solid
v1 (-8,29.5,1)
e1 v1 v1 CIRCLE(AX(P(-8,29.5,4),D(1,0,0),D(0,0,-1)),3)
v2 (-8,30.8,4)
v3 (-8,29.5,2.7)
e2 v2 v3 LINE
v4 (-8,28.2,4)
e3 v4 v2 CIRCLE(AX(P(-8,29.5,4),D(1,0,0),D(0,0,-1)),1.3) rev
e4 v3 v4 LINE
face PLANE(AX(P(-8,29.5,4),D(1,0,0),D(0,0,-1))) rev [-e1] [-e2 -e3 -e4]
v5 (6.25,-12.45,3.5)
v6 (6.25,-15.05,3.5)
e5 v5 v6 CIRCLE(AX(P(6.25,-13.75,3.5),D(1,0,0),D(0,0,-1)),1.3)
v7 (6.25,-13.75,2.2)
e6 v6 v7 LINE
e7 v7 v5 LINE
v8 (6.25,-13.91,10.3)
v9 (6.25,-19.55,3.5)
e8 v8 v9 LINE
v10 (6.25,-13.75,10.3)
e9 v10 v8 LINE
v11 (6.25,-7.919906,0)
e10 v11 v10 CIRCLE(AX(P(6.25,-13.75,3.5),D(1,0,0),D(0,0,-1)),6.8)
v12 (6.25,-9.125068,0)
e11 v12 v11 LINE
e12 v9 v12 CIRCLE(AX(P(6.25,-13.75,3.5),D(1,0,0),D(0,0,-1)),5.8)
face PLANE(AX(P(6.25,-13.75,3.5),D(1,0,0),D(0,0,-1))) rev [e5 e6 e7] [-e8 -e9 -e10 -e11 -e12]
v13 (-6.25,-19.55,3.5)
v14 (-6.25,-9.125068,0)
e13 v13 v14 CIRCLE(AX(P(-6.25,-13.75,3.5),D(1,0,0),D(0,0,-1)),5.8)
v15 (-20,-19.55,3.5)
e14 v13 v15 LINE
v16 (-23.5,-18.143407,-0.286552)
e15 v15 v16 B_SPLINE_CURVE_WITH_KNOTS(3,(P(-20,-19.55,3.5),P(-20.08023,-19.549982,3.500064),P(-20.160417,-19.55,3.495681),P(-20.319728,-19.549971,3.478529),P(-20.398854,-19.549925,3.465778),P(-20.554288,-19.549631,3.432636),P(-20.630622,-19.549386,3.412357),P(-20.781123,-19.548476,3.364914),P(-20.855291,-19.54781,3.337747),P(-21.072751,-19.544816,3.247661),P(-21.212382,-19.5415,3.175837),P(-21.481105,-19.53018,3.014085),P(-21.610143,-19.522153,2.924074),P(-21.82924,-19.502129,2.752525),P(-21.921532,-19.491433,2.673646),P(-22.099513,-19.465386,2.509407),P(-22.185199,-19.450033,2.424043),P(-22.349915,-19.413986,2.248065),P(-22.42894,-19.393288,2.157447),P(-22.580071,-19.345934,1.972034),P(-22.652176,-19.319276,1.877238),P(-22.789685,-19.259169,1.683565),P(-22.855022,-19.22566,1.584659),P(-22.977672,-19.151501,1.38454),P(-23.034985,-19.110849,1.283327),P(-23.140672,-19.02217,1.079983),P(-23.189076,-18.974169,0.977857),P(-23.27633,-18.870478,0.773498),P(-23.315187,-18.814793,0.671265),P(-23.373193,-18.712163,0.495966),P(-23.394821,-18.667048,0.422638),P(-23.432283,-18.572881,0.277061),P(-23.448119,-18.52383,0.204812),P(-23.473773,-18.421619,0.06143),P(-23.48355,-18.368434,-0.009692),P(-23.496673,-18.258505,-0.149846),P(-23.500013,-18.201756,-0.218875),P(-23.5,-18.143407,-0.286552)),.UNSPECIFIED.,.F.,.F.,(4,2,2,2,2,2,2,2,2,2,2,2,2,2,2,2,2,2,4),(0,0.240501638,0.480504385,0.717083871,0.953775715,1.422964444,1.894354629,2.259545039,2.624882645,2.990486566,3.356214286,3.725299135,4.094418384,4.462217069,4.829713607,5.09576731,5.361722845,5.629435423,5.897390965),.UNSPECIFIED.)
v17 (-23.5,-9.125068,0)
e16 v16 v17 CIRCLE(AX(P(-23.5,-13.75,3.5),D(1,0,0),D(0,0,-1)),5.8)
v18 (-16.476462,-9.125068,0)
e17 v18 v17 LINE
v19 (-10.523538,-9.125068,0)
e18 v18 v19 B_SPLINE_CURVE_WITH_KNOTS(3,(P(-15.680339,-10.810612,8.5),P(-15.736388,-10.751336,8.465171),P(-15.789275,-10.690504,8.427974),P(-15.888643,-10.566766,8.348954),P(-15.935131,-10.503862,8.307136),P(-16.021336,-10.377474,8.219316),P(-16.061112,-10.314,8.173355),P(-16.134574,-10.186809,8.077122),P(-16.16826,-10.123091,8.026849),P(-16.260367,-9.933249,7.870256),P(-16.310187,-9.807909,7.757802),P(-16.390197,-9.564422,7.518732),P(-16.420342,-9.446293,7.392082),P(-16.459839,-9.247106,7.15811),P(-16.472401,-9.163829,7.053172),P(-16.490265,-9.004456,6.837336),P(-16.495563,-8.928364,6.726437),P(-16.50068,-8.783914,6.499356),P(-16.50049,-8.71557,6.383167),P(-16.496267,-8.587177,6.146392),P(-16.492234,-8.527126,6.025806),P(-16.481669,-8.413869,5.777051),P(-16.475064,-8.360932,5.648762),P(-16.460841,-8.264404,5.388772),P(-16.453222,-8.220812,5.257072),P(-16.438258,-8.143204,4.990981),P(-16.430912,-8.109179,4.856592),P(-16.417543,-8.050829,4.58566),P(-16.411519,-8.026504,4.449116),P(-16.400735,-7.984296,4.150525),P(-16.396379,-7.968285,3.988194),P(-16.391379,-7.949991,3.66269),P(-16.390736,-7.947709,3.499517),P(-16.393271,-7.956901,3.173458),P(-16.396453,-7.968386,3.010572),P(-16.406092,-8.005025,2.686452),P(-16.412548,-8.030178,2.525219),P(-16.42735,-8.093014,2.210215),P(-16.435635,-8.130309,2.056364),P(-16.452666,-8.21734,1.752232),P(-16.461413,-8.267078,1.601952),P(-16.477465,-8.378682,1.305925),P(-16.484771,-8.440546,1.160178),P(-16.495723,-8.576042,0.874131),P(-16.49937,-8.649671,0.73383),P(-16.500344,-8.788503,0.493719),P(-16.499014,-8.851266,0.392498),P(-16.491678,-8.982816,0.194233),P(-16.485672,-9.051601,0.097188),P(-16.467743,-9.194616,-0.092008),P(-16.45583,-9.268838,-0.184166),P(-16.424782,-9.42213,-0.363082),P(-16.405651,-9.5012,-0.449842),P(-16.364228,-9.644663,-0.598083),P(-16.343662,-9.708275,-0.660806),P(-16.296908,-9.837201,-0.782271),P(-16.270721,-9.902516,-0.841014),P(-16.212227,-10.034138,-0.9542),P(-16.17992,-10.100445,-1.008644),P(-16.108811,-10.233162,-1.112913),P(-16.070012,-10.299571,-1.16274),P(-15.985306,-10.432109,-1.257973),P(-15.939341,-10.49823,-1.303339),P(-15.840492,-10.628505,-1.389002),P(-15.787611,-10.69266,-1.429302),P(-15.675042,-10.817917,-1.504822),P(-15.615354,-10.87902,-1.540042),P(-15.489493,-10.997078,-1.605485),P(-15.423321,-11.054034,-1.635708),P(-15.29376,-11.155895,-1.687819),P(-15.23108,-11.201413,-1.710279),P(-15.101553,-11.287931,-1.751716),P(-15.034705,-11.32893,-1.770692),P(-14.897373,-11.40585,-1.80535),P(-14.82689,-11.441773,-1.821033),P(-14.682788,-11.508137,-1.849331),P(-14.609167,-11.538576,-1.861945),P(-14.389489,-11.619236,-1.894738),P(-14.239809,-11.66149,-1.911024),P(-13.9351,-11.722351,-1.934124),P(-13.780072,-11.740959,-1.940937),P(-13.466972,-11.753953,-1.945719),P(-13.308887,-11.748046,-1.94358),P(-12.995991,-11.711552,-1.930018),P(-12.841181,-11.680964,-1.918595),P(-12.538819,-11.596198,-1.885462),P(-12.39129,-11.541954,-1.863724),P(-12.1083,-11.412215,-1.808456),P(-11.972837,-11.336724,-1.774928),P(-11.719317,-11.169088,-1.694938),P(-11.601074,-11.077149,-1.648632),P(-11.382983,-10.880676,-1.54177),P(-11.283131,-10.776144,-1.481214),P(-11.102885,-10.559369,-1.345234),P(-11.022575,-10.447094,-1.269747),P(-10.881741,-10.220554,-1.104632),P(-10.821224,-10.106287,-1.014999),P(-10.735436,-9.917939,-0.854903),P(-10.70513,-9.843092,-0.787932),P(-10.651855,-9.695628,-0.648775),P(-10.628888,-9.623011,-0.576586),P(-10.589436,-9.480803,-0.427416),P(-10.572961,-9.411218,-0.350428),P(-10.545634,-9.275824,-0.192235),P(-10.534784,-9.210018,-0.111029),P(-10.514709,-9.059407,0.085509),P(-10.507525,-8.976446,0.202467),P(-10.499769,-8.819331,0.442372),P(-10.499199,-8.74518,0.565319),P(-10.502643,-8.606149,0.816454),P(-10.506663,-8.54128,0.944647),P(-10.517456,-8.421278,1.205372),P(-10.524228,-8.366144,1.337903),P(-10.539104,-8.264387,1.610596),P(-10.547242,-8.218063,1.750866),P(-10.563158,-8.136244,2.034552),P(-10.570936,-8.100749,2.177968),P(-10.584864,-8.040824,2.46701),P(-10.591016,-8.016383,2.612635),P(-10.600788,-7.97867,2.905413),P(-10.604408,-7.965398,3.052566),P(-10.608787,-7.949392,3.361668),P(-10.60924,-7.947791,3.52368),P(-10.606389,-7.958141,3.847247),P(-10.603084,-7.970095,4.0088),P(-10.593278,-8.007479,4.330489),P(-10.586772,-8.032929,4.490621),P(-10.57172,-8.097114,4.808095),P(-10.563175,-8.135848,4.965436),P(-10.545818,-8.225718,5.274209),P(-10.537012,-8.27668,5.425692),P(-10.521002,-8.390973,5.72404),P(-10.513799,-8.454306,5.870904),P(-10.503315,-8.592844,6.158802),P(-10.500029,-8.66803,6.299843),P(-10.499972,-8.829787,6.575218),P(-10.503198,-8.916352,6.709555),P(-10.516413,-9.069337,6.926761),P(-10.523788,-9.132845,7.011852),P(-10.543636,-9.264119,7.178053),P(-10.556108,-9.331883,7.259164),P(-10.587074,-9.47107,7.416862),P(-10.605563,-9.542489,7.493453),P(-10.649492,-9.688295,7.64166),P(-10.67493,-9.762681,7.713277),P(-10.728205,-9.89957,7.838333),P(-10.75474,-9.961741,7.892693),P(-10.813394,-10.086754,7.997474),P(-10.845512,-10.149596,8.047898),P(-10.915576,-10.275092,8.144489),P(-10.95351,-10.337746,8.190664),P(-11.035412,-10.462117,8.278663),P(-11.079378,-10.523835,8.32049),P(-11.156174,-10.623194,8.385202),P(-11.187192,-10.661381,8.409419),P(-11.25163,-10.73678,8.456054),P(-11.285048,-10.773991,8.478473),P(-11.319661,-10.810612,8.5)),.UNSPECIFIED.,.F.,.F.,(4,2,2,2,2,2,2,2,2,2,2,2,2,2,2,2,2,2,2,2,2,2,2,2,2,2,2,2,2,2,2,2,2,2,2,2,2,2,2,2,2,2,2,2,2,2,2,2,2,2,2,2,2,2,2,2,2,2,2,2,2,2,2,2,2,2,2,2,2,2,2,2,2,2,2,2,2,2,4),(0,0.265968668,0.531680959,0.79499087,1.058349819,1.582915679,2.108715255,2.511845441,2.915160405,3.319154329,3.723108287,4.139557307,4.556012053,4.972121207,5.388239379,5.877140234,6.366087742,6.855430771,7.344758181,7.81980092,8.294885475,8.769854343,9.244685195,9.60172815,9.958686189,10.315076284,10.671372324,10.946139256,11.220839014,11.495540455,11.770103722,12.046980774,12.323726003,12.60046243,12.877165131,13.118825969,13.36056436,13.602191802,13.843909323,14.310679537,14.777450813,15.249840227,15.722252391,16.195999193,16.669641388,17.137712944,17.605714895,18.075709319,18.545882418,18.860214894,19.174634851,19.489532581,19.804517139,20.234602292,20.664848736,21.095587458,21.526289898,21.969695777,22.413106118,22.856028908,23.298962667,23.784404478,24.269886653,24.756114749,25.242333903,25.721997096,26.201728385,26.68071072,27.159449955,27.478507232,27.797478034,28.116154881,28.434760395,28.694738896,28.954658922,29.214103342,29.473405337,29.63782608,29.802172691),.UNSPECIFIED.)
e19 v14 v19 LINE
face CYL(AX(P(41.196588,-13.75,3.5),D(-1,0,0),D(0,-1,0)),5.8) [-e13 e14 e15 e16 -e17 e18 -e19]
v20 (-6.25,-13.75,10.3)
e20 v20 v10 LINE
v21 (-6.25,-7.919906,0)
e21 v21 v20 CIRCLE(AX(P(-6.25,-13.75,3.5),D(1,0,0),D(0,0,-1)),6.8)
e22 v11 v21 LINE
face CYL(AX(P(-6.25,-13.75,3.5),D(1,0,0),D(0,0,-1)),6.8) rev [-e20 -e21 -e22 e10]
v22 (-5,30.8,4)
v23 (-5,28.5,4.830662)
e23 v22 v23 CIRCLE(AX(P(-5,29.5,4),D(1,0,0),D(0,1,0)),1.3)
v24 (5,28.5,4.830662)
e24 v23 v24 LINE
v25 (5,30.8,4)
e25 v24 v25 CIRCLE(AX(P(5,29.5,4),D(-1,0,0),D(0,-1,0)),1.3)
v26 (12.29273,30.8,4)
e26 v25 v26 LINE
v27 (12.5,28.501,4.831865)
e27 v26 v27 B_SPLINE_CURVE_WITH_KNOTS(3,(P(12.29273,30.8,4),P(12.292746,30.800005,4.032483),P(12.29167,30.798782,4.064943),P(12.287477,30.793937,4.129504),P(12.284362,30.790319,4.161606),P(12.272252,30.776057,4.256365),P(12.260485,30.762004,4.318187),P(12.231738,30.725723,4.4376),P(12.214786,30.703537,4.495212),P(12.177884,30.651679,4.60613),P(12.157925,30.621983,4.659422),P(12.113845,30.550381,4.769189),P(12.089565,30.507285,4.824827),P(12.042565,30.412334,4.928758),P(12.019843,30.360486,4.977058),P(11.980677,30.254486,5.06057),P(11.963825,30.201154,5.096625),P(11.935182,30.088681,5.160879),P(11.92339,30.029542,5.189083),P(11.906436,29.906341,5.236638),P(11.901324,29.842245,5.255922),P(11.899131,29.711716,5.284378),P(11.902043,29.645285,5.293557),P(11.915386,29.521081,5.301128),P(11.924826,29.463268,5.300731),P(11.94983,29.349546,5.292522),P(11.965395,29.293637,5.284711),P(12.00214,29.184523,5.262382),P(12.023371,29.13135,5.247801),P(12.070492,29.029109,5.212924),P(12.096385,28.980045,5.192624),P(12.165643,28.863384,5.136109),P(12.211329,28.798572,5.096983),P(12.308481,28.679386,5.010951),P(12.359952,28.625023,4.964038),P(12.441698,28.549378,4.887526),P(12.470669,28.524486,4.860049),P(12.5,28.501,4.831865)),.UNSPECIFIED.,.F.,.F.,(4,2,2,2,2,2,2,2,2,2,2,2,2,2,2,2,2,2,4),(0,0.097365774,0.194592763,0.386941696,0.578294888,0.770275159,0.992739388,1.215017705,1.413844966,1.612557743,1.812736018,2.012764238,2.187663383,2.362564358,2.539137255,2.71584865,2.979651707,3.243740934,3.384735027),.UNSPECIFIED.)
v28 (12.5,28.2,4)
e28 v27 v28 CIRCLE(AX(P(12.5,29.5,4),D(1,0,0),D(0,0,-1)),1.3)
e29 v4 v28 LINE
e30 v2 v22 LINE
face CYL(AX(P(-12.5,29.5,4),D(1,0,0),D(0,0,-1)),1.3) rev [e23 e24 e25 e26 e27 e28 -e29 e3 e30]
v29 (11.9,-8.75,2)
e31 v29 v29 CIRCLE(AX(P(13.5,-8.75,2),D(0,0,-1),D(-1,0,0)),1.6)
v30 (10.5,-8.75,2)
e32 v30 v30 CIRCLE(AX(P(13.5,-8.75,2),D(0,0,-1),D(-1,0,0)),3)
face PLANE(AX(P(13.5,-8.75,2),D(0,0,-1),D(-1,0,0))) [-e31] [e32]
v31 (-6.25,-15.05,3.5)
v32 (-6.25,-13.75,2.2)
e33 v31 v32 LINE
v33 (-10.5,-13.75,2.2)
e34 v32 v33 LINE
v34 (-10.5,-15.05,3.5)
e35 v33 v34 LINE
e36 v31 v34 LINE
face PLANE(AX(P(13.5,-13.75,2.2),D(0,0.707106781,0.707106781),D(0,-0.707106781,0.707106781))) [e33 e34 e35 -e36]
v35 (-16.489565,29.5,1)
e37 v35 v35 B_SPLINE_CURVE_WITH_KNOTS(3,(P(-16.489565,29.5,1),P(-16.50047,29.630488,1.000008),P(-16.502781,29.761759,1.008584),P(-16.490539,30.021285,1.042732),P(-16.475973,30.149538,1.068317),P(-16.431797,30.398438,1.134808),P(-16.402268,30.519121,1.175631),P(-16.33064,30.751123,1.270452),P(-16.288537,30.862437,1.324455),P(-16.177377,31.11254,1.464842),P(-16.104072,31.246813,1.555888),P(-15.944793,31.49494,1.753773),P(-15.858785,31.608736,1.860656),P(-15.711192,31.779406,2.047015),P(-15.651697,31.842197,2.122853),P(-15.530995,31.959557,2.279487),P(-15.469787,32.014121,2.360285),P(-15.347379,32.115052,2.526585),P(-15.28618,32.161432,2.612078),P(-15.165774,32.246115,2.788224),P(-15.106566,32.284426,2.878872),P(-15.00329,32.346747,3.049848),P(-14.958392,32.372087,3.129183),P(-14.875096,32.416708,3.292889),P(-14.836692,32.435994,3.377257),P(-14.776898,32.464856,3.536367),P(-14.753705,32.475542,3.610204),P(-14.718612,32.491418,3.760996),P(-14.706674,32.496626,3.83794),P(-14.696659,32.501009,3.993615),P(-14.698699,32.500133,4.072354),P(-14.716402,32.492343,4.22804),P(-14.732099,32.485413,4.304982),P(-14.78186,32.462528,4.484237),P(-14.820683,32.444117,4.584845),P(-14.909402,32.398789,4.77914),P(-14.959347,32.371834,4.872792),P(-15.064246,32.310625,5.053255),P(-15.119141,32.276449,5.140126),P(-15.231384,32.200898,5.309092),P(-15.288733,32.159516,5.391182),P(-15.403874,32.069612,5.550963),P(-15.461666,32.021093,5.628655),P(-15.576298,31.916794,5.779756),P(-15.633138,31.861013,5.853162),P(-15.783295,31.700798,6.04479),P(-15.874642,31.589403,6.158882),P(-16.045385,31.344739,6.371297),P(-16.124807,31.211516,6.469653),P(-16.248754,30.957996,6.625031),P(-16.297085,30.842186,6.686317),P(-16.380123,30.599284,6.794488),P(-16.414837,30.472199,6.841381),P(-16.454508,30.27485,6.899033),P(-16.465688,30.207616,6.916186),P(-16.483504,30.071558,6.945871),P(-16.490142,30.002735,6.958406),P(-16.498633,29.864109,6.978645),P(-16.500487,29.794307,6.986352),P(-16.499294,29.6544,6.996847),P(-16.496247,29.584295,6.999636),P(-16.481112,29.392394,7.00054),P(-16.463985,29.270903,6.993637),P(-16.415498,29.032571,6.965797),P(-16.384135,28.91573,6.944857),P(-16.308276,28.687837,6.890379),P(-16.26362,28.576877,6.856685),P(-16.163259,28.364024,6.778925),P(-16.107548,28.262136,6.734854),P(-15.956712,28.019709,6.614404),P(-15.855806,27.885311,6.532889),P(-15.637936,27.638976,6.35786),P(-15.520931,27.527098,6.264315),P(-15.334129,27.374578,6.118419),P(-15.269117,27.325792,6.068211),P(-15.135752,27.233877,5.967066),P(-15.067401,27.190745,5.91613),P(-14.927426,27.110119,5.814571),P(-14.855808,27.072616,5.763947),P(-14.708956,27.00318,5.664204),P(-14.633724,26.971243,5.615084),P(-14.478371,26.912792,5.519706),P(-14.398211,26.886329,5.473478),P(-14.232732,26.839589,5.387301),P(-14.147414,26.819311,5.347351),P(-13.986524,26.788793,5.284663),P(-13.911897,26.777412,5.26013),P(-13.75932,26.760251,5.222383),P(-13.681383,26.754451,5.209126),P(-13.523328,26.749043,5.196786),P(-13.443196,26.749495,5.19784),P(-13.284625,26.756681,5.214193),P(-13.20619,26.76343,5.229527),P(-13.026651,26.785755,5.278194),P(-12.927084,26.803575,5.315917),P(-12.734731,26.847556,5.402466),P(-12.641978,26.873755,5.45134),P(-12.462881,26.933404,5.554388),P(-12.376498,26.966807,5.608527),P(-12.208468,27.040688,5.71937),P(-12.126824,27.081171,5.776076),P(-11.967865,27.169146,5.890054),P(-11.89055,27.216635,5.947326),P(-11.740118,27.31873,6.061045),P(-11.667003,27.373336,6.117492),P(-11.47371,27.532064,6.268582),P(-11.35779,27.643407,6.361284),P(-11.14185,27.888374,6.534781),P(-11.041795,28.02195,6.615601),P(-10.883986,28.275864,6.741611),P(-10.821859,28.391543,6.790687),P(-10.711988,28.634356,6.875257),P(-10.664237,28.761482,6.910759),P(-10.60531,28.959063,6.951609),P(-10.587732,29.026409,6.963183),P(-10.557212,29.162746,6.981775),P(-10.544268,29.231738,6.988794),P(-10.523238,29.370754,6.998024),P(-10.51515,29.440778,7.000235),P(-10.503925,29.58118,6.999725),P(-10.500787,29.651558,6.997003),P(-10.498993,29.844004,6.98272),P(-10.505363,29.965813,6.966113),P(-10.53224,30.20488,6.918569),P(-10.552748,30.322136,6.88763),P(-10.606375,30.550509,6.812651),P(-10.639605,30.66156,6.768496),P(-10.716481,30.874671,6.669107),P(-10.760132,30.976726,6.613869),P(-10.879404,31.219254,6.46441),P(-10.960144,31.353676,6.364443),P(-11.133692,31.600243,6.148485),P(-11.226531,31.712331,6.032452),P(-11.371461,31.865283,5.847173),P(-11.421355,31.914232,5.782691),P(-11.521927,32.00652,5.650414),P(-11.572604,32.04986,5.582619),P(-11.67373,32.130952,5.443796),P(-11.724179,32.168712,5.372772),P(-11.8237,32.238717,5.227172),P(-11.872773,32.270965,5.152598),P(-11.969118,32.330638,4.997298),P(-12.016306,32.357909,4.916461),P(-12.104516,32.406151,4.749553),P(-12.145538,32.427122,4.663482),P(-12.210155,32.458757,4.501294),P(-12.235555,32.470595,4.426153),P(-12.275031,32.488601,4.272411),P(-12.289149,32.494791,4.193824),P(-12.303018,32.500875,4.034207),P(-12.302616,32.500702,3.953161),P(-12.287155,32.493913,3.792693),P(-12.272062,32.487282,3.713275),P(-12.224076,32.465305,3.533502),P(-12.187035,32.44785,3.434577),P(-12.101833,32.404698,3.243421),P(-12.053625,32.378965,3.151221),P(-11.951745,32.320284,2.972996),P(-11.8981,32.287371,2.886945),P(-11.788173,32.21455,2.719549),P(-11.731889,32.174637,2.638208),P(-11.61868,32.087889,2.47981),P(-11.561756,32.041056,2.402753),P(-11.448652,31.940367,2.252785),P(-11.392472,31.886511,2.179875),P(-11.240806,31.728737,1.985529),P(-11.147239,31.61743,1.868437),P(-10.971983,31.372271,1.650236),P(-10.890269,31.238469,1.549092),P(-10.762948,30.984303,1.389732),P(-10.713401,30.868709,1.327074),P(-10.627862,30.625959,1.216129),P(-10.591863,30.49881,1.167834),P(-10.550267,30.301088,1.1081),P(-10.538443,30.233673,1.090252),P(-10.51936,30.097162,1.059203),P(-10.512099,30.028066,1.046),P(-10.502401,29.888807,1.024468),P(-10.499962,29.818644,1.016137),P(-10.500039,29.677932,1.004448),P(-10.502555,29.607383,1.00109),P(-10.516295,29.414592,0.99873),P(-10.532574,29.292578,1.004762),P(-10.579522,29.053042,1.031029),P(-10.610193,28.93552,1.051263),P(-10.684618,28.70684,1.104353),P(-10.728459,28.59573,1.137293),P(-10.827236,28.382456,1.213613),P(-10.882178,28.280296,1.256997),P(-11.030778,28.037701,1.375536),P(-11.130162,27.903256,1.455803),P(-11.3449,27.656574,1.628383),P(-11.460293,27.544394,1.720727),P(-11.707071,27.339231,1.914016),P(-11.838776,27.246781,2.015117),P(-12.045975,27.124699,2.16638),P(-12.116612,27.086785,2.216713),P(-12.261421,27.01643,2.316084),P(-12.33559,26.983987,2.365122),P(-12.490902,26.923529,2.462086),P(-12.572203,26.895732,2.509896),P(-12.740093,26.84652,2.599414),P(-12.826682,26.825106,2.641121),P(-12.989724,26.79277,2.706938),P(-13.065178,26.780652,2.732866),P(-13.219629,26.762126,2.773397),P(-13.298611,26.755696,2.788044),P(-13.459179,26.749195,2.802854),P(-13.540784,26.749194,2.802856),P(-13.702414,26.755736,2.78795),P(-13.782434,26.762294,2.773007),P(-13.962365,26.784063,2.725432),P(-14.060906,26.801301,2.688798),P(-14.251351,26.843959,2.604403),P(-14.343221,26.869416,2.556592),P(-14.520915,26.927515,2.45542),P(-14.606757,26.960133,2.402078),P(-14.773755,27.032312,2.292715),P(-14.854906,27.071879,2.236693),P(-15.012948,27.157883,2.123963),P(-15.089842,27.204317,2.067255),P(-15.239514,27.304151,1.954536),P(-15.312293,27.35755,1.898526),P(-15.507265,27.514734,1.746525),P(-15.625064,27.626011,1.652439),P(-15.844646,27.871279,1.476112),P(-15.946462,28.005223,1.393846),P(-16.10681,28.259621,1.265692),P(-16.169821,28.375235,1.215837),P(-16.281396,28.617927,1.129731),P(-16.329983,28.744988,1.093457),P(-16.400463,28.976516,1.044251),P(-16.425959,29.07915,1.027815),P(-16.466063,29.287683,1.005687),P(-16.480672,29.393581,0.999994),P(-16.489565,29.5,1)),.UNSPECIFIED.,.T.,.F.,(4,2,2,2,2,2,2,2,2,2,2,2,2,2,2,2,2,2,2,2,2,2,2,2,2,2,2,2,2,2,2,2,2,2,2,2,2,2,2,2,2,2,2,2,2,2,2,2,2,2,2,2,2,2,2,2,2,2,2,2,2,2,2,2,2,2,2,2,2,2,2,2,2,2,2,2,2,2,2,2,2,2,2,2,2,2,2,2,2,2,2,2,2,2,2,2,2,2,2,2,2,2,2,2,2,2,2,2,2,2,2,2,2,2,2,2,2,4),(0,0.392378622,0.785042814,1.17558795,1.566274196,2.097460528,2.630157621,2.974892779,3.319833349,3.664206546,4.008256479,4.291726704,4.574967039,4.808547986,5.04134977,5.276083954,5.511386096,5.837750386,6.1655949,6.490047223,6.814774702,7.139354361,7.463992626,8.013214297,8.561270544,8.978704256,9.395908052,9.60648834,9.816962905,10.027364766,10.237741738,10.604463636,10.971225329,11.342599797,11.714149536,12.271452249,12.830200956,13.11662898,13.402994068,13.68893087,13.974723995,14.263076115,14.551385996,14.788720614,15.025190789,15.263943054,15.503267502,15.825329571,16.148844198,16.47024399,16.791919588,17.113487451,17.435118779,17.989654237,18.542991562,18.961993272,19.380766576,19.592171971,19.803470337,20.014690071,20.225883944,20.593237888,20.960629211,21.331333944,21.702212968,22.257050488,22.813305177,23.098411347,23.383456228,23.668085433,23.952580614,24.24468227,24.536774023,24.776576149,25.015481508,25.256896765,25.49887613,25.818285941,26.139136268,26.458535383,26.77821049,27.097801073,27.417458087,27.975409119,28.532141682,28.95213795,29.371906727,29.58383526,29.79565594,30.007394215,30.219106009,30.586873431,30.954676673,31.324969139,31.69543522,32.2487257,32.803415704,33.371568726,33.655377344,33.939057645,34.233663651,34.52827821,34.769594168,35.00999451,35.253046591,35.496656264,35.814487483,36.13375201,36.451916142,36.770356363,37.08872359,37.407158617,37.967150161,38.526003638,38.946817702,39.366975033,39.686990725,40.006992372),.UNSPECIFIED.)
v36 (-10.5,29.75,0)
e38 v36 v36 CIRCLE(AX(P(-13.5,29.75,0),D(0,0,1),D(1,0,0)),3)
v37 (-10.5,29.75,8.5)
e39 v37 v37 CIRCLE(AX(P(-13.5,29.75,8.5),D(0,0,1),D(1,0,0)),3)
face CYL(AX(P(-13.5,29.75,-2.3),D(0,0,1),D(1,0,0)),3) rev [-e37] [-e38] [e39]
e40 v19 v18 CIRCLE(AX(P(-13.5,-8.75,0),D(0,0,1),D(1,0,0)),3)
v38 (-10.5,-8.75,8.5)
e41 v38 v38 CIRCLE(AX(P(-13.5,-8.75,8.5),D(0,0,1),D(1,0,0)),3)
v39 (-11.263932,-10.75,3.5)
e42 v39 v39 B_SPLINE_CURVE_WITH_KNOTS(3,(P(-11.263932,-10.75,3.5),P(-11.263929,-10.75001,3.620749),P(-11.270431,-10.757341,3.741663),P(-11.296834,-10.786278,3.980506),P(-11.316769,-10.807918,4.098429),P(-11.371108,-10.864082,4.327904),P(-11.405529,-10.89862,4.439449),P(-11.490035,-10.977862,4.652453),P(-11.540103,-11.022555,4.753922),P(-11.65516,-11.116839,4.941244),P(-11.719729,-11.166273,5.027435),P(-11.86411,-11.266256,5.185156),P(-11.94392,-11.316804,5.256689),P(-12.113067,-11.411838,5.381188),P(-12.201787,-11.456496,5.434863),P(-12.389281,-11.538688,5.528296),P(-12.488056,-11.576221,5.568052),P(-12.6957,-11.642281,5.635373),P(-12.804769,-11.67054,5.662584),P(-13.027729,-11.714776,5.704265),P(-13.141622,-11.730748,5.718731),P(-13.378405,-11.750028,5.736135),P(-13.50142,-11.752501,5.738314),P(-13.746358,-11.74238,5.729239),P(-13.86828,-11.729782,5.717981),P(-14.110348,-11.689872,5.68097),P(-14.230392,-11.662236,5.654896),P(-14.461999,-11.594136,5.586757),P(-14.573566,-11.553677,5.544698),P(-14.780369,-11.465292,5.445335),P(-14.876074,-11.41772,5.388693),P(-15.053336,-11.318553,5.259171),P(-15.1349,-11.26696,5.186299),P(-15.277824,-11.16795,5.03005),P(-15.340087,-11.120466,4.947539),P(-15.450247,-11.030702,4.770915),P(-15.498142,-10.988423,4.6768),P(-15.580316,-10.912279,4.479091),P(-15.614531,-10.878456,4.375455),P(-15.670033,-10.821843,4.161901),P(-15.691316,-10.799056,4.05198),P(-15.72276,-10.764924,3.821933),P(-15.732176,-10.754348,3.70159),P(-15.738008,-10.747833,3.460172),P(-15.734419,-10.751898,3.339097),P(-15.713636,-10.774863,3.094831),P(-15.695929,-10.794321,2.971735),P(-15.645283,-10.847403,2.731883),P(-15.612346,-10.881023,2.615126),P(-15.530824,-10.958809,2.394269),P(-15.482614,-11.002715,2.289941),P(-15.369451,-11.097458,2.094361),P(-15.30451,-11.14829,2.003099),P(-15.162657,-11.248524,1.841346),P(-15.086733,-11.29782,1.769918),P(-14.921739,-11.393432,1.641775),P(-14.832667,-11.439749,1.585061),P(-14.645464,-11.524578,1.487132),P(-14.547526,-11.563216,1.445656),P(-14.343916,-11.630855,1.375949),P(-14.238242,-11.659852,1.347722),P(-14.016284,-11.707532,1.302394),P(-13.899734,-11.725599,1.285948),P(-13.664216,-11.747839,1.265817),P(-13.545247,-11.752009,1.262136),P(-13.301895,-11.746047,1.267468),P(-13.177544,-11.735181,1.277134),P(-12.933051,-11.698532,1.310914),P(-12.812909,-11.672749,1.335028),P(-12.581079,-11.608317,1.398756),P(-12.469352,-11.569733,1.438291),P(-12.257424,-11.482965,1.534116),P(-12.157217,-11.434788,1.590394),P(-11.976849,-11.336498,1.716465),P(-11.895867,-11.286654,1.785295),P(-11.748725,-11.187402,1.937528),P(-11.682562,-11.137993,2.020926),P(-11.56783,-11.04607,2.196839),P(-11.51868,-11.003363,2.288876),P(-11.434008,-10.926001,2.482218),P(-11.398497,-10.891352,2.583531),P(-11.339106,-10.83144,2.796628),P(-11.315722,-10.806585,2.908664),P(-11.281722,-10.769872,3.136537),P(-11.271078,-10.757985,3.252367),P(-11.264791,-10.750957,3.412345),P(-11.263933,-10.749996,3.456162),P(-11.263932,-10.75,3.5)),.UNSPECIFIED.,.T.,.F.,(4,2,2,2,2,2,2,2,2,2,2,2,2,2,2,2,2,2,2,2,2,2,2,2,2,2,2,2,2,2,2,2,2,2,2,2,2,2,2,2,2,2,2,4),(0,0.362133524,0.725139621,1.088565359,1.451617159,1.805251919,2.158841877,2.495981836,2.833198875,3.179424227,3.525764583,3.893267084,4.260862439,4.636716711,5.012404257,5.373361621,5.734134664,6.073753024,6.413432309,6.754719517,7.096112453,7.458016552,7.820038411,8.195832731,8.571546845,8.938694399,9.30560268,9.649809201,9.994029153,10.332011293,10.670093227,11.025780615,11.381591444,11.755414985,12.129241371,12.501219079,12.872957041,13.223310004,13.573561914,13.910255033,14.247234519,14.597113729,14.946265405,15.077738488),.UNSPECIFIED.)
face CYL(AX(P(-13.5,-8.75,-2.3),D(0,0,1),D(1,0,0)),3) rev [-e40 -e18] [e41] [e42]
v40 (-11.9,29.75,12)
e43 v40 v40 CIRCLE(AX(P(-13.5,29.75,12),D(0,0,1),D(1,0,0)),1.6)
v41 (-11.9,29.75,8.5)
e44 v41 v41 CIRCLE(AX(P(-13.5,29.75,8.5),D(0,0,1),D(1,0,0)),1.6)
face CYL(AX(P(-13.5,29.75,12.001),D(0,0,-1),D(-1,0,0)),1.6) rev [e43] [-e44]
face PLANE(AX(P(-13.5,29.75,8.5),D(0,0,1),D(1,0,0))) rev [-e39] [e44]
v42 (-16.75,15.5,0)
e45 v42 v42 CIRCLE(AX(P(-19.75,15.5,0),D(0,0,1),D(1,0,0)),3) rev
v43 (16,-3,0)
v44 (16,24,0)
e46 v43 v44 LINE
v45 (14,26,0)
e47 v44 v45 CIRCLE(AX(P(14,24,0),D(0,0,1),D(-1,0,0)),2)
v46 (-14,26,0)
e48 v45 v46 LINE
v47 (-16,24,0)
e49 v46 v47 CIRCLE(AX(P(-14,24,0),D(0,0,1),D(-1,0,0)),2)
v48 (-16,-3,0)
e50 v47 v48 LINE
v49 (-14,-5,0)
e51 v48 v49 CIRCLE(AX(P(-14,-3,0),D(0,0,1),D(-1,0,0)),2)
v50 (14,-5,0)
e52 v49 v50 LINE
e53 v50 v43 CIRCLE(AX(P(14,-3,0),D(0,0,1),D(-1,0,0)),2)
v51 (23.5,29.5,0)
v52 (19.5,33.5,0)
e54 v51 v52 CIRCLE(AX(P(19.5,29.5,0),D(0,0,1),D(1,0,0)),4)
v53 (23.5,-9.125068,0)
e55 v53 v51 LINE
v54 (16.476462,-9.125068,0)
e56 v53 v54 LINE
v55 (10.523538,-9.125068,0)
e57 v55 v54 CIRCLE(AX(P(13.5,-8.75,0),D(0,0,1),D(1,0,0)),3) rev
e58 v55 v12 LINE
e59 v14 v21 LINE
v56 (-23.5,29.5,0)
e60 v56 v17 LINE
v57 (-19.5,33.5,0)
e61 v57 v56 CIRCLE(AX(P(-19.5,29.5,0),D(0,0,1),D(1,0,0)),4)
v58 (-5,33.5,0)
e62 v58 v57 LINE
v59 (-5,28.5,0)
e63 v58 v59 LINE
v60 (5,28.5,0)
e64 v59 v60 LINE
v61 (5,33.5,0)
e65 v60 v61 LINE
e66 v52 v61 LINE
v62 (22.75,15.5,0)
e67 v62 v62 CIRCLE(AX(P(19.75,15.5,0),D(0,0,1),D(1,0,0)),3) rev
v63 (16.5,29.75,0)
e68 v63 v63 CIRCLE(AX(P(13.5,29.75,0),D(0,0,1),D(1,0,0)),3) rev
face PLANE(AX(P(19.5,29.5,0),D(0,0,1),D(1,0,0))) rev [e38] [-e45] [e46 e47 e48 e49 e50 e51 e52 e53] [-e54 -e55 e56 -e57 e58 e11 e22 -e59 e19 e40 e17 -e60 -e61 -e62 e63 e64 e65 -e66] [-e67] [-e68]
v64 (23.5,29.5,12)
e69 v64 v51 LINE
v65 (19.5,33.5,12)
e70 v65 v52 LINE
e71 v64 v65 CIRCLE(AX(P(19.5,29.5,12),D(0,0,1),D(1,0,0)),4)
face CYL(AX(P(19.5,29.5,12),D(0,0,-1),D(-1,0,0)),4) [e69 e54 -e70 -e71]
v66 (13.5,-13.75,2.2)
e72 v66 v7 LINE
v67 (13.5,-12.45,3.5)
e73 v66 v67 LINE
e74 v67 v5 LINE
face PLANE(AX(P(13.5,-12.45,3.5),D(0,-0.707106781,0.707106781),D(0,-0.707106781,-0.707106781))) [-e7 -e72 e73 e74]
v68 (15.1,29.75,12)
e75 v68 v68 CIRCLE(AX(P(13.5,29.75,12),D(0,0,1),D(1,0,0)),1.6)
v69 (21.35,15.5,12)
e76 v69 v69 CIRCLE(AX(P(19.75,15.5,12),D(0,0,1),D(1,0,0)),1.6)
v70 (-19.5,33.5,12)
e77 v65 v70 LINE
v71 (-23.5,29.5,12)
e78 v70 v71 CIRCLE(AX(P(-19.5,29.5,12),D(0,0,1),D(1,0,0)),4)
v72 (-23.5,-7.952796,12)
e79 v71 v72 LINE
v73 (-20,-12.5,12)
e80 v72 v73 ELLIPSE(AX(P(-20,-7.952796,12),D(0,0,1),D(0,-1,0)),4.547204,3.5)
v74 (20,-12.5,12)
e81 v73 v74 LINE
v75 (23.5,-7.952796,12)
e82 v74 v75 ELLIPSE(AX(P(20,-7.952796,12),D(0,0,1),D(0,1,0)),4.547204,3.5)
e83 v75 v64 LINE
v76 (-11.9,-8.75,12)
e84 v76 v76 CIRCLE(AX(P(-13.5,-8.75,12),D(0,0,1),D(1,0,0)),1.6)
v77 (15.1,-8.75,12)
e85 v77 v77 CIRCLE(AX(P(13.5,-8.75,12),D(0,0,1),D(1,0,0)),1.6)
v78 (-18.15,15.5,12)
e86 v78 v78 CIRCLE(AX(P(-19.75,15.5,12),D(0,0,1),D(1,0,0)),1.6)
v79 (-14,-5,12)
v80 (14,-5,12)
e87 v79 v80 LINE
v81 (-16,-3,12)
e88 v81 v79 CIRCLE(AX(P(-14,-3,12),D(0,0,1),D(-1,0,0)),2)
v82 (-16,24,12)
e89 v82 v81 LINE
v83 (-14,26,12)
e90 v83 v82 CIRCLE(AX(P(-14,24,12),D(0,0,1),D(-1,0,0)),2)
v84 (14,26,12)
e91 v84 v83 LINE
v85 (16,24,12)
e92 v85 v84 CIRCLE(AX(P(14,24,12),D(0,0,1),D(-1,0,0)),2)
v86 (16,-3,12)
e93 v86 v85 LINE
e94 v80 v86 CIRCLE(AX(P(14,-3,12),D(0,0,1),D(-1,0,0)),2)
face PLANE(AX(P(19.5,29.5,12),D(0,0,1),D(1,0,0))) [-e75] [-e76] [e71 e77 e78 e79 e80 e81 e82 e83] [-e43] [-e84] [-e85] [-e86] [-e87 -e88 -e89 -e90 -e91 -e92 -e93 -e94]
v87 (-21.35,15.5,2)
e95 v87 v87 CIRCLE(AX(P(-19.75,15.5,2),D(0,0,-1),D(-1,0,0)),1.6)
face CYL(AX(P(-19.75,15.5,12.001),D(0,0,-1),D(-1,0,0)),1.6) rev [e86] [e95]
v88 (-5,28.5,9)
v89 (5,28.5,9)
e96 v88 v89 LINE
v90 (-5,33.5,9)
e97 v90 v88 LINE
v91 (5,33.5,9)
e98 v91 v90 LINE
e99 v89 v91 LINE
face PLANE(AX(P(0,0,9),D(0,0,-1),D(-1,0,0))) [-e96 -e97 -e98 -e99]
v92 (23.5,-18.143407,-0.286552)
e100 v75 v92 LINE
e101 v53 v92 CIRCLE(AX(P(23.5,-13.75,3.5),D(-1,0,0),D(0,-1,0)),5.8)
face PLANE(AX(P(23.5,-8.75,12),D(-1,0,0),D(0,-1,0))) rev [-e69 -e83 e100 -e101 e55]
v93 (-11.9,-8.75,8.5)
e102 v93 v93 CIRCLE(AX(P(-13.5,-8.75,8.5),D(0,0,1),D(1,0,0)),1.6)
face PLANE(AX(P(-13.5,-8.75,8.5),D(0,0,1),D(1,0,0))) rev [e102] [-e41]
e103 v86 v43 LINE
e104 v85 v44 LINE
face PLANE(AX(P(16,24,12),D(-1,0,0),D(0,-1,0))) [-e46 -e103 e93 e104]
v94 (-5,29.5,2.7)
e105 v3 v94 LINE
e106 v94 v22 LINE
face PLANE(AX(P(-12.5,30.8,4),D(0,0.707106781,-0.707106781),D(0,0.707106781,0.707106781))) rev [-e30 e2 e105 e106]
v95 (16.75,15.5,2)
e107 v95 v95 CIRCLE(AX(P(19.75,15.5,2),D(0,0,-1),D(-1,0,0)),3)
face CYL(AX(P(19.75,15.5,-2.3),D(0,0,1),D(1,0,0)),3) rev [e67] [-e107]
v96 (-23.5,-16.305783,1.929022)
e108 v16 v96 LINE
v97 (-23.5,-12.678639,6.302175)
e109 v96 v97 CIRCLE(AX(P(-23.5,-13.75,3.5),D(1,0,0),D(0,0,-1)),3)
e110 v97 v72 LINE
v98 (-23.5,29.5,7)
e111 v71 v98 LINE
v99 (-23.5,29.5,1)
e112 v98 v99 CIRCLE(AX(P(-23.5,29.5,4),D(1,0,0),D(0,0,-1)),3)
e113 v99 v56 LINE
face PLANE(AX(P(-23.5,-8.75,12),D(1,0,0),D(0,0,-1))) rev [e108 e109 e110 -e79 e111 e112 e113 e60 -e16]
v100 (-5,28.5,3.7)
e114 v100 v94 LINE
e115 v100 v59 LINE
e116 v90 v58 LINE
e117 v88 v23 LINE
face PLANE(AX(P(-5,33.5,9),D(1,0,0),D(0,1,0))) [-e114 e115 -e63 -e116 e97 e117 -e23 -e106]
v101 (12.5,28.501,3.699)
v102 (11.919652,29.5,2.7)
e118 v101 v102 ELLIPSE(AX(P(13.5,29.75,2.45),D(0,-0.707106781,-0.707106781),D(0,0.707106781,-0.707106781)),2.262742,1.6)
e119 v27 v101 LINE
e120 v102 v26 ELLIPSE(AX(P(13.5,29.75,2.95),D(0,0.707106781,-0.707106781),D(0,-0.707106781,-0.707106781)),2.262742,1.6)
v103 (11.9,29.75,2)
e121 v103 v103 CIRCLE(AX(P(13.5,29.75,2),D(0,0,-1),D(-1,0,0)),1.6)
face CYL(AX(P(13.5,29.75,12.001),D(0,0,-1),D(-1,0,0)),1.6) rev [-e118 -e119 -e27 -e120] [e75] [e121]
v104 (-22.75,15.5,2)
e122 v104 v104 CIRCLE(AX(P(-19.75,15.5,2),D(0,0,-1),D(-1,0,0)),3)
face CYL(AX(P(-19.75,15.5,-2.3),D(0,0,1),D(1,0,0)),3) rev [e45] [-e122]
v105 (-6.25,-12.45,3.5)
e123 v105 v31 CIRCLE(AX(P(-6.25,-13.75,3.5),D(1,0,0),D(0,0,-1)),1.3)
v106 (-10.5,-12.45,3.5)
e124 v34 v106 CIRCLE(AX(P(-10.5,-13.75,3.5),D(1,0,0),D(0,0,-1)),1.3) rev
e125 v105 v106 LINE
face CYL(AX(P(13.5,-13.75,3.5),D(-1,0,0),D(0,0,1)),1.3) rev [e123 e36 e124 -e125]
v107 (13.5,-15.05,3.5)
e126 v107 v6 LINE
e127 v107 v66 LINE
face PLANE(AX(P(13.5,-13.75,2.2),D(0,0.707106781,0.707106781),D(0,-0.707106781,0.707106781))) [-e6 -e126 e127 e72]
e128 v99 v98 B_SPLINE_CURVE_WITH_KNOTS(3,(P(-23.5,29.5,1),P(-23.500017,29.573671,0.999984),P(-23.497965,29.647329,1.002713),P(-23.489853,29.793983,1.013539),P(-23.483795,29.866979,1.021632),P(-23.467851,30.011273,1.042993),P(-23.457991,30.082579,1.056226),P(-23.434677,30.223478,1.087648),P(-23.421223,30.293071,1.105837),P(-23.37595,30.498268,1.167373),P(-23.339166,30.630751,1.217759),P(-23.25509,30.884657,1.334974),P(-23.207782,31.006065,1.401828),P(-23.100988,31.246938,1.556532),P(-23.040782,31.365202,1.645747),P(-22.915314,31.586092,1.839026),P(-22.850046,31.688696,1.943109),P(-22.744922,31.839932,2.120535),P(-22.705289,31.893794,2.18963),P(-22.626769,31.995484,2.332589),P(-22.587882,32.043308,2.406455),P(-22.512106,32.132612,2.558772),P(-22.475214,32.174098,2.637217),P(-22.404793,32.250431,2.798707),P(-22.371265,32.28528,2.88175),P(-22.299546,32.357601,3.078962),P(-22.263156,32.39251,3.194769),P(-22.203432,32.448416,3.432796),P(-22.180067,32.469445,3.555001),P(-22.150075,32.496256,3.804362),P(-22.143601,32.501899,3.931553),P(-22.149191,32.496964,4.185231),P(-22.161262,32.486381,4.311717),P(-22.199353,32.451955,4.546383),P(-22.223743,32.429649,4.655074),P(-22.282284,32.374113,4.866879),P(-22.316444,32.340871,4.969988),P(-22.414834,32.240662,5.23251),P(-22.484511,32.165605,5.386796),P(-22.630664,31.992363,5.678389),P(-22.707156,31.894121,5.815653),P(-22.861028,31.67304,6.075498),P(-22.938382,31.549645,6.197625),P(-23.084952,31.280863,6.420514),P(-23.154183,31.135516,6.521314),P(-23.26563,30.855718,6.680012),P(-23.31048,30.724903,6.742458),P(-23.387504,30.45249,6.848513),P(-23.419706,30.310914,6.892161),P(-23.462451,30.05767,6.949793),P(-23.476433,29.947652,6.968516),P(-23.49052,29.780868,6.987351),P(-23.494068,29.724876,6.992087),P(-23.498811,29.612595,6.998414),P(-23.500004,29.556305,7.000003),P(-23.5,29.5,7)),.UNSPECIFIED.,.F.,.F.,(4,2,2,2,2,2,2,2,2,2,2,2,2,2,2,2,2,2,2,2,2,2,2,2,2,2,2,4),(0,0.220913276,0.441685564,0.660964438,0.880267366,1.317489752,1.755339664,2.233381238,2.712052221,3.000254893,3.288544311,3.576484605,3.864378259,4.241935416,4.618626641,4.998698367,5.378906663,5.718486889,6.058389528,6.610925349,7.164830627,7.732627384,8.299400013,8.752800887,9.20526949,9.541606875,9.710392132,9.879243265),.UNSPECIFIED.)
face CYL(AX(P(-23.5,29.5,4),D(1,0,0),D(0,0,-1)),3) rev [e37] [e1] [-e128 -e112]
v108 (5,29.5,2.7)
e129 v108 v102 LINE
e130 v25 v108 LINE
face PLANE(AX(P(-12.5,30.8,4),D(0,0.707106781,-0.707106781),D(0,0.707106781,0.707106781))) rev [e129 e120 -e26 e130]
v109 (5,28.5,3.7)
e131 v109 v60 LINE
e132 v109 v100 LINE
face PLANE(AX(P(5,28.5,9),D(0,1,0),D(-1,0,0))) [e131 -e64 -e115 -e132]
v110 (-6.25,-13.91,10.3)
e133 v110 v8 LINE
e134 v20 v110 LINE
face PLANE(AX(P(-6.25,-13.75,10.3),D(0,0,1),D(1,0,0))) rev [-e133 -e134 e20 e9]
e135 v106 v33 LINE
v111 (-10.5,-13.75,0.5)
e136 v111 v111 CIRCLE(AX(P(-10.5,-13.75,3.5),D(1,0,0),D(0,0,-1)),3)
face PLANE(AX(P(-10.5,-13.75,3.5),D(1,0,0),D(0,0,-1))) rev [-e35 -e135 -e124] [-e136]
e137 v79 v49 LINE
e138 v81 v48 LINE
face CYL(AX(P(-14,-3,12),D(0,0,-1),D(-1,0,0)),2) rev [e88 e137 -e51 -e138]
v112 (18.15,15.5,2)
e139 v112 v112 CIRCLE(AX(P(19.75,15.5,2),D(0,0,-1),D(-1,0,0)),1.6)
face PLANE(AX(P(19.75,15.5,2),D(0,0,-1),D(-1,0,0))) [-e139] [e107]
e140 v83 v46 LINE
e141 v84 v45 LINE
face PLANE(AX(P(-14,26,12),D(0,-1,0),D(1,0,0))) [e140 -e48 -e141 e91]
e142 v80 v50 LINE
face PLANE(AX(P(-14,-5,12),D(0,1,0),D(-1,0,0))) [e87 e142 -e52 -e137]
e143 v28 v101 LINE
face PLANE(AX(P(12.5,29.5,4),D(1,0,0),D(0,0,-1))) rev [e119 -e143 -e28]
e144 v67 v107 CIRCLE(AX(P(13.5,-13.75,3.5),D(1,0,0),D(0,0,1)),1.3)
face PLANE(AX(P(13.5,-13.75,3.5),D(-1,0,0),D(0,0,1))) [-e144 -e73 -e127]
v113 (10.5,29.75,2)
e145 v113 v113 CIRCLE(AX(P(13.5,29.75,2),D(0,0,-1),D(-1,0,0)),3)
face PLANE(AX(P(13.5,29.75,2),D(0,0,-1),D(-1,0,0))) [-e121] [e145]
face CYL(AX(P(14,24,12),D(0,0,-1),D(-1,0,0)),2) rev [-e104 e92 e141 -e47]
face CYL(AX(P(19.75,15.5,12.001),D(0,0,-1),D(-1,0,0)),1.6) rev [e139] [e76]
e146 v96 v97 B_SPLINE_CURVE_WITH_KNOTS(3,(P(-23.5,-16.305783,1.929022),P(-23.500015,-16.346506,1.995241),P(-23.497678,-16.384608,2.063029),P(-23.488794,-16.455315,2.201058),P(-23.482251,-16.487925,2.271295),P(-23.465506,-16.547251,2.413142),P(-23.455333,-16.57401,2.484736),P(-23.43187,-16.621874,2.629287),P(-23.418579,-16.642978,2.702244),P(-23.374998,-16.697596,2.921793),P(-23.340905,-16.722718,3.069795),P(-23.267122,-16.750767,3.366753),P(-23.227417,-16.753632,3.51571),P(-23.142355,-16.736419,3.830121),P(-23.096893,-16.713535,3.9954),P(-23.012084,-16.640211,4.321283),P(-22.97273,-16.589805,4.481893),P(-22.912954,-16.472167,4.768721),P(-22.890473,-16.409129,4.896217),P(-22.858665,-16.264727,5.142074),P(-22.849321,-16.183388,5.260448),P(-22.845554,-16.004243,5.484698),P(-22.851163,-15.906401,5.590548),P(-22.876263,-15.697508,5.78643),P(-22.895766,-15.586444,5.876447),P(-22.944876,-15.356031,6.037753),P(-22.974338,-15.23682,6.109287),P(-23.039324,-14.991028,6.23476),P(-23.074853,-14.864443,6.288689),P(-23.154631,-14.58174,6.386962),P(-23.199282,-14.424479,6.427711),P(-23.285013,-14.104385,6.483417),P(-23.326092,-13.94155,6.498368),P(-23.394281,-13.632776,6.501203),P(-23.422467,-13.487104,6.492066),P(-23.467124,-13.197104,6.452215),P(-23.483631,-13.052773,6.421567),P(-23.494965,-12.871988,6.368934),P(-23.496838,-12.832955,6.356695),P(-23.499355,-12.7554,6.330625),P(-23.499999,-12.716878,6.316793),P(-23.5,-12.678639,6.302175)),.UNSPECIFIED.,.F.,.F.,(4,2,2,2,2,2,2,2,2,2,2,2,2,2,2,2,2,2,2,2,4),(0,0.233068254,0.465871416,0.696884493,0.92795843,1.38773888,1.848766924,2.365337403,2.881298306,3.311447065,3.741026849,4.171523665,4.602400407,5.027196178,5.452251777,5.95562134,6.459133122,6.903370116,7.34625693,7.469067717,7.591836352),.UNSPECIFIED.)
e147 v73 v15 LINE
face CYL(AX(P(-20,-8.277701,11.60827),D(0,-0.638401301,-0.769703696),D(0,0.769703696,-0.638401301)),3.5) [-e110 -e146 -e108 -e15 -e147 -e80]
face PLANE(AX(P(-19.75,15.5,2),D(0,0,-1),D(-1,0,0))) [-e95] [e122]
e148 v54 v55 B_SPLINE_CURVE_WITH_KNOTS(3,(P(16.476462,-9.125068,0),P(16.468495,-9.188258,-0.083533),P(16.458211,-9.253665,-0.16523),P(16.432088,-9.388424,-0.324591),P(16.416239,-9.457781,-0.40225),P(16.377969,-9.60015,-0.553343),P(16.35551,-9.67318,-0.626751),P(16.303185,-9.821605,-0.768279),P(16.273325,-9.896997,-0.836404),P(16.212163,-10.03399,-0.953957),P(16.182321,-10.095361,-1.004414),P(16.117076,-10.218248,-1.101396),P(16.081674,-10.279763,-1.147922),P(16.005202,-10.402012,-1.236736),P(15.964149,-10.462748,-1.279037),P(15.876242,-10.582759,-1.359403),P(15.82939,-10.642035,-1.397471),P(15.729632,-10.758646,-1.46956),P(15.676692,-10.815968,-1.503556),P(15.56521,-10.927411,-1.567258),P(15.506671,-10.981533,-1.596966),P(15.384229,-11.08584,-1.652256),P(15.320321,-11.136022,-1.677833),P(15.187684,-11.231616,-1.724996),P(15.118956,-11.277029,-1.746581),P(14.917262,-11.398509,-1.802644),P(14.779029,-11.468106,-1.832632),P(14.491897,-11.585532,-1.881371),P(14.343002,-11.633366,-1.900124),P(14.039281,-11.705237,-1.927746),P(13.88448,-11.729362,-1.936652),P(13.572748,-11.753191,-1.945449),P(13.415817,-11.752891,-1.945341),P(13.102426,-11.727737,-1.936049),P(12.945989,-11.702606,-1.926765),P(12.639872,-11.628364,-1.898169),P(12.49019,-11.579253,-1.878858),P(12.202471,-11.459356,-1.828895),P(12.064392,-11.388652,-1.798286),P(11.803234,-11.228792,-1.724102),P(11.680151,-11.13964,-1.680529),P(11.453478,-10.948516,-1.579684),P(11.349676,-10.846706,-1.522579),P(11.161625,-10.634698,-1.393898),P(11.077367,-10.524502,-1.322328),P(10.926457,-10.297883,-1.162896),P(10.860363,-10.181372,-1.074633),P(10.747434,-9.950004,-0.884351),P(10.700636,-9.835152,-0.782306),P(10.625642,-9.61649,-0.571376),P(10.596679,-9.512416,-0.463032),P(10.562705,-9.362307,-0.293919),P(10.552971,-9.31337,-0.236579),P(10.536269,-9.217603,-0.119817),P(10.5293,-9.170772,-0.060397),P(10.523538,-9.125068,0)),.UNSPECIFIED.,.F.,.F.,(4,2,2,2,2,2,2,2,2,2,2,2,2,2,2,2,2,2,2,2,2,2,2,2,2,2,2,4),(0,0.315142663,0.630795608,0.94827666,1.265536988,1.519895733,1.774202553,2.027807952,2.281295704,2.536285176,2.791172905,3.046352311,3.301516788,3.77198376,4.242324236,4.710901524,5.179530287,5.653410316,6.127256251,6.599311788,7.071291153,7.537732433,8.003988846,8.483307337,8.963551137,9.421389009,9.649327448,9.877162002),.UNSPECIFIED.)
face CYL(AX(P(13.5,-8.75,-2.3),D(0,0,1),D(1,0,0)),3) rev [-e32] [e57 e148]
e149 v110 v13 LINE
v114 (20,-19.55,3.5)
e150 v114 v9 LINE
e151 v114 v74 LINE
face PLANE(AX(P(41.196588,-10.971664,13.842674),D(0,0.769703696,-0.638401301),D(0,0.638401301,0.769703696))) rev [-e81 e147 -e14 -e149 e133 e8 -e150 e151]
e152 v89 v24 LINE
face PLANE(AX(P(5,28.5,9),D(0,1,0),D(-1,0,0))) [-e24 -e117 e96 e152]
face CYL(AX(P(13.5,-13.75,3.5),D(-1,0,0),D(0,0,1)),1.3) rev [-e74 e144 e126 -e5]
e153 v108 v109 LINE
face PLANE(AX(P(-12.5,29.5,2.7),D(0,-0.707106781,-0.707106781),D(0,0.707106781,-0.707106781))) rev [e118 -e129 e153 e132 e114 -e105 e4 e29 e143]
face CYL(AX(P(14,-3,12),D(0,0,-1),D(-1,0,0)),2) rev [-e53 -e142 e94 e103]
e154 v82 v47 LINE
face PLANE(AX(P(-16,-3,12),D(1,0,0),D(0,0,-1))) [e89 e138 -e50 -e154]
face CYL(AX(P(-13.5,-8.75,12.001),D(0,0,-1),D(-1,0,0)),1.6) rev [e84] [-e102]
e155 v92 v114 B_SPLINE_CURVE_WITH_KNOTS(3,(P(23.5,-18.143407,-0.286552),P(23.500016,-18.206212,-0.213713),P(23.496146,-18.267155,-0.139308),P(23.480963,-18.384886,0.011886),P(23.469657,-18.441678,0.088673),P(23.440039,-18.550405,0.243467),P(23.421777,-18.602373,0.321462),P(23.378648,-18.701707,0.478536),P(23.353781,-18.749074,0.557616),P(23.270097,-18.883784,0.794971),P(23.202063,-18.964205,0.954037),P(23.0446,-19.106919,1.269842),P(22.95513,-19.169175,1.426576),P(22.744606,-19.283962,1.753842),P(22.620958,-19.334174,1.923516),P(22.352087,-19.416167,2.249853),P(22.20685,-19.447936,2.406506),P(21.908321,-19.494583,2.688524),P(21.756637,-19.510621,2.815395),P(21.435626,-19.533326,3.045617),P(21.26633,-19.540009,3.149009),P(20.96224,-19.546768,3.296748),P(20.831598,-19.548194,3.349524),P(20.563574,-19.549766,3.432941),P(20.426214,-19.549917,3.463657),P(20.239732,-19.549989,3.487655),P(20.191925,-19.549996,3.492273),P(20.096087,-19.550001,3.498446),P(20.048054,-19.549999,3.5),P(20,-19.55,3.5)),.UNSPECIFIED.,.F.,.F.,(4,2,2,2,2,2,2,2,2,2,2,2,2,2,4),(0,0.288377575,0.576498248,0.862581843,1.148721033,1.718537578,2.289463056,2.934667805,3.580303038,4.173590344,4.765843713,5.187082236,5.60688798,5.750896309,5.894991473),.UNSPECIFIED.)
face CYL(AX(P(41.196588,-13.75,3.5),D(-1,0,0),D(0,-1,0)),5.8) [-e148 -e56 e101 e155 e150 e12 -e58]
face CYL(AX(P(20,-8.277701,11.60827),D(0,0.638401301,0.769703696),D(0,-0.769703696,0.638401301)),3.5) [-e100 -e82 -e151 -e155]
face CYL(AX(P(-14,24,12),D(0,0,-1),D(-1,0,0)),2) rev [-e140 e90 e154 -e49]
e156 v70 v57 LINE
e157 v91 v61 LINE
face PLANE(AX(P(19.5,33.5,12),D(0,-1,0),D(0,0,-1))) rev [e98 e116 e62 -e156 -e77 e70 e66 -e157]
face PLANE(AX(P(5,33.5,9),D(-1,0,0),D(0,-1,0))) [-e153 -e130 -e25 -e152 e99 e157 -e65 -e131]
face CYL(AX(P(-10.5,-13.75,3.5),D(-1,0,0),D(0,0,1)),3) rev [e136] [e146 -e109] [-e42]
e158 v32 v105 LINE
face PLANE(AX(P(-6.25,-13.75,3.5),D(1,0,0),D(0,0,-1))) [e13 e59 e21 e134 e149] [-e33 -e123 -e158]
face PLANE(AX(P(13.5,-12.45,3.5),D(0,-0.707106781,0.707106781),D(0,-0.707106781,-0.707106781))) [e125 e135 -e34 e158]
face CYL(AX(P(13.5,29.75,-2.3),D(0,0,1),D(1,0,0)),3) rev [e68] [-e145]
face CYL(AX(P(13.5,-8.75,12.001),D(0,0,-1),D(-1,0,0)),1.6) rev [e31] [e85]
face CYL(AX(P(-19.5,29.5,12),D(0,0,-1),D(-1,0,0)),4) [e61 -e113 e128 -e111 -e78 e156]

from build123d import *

# Parameters (mm, degrees)
BOSS_EXTRUDE1_DEPTH        = 12
CUT_EXTRUDE1_REACH         = 44.644
SKETCH3_R                  = 1.6
SKETCH6_W                  = 10
SKETCH6_H                  = 5
CUT_EXTRUDE3_DEPTH         = 9
CUT_EXTRUDE4_DEPTH         = 12.5
CUT_EXTRUDE5_START         = -23.5
CUT_EXTRUDE5_OUTLINE_R     = 3
CUT_EXTRUDE5_DEPTH         = 15.5
BOSS_EXTRUDE4_START        = -23.5
BOSS_EXTRUDE4_DEPTH        = 47
PIVOTSCREWHEADCUTOUT_START = -23.5
SKETCH10_R                 = 3
PIVOTSCREWHEADCUTOUT_DEPTH = 13
CUT_EXTRUDE2_START         = 8.5
SKETCH4_R                  = 3
CUT_EXTRUDE2_DEPTH         = 52.143874282
CUT_EXTRUDE10_START        = 10
SKETCH16_R                 = 3
CUT_EXTRUDE10_DEPTH        = 160.510325132
CUT_EXTRUDE7_START         = -23.5
CUT_EXTRUDE7_DEPTH         = 37
FILLET1_R                  = 3.5
CUT_EXTRUDE9_DEPTH         = 6.25


# Read off the part's stored shape, not the designer's step: Cut-Extrude5
with BuildPart() as part:
    # Sketch2 → Boss-Extrude1 (new body)
    with BuildSketch(Plane.XY):
        with BuildLine():
            Line((23.5, -8.75), (23.5, 29.5))
            ThreePointArc((23.5, 29.5), (22.328427125, 32.328427125), (19.5, 33.5))
            Line((19.5, 33.5), (-19.5, 33.5))
            ThreePointArc((-19.5, 33.5), (-22.328427125, 32.328427125), (-23.5, 29.5))
            Line((-23.5, 29.5), (-23.5, -8.75))
            Line((-23.5, -8.75), (-23.5, -12.5))
            Line((-23.5, -12.5), (-19.499997491, -12.5))
            Line((-19.499997491, -12.5), (19.531687848, -12.5))
            Line((19.531687848, -12.5), (23.5, -12.5))
            Line((23.5, -12.5), (23.5, -8.75))
        make_face()
        with BuildLine():
            Line((-16, -3), (-16, 24))
            ThreePointArc((-16, 24), (-15.414213562, 25.414213562), (-14, 26))
            Line((-14, 26), (14, 26))
            ThreePointArc((14, 26), (15.414213562, 25.414213562), (16, 24))
            Line((16, 24), (16, -3))
            ThreePointArc((16, -3), (15.414213562, -4.414213562), (14, -5))
            Line((14, -5), (-14, -5))
            ThreePointArc((-14, -5), (-15.414213562, -4.414213562), (-16, -3))
        make_face(mode=Mode.SUBTRACT)
    extrude(amount=BOSS_EXTRUDE1_DEPTH)

    # Sketch3 → Cut-Extrude1 (cut, up to next)
    with BuildSketch(Plane.XY, mode=Mode.PRIVATE) as cut_extrude1_sk1:
        with Locations((-13.5, 29.75)):
            Circle(SKETCH3_R)
    cut_extrude1_tool1 = extrude(cut_extrude1_sk1.sketch, amount=CUT_EXTRUDE1_REACH, mode=Mode.PRIVATE) & part.part
    # Sketch3 → Cut-Extrude1 (cut, up to next)
    with BuildSketch(Plane.XY, mode=Mode.PRIVATE) as cut_extrude1_sk2:
        with Locations((13.5, 29.75)):
            Circle(SKETCH3_R)
    cut_extrude1_tool2 = extrude(cut_extrude1_sk2.sketch, amount=CUT_EXTRUDE1_REACH, mode=Mode.PRIVATE) & part.part
    # Sketch3 → Cut-Extrude1 (cut, up to next)
    with BuildSketch(Plane.XY, mode=Mode.PRIVATE) as cut_extrude1_sk3:
        with Locations((19.75, 15.5)):
            Circle(SKETCH3_R)
    cut_extrude1_tool3 = extrude(cut_extrude1_sk3.sketch, amount=CUT_EXTRUDE1_REACH, mode=Mode.PRIVATE) & part.part
    # Sketch3 → Cut-Extrude1 (cut, up to next)
    with BuildSketch(Plane.XY, mode=Mode.PRIVATE) as cut_extrude1_sk4:
        with Locations((-19.75, 15.5)):
            Circle(SKETCH3_R)
    cut_extrude1_tool4 = extrude(cut_extrude1_sk4.sketch, amount=CUT_EXTRUDE1_REACH, mode=Mode.PRIVATE) & part.part
    # Sketch3 → Cut-Extrude1 (cut, up to next)
    with BuildSketch(Plane.XY, mode=Mode.PRIVATE) as cut_extrude1_sk5:
        with Locations((-13.5, -8.75)):
            Circle(SKETCH3_R)
    cut_extrude1_tool5 = extrude(cut_extrude1_sk5.sketch, amount=CUT_EXTRUDE1_REACH, mode=Mode.PRIVATE) & part.part
    # Sketch3 → Cut-Extrude1 (cut, up to next)
    with BuildSketch(Plane.XY, mode=Mode.PRIVATE) as cut_extrude1_sk6:
        with Locations((13.5, -8.75)):
            Circle(SKETCH3_R)
    cut_extrude1_tool6 = extrude(cut_extrude1_sk6.sketch, amount=CUT_EXTRUDE1_REACH, mode=Mode.PRIVATE) & part.part
    add(cut_extrude1_tool1.solids().sort_by_distance((-13.5, 29.75, 0))[0], mode=Mode.SUBTRACT)
    add(cut_extrude1_tool2.solids().sort_by_distance((13.5, 29.75, 0))[0], mode=Mode.SUBTRACT)
    add(cut_extrude1_tool3.solids().sort_by_distance((19.75, 15.5, 0))[0], mode=Mode.SUBTRACT)
    add(cut_extrude1_tool4.solids().sort_by_distance((-19.75, 15.5, 0))[0], mode=Mode.SUBTRACT)
    add(cut_extrude1_tool5.solids().sort_by_distance((-13.5, -8.75, 0))[0], mode=Mode.SUBTRACT)
    add(cut_extrude1_tool6.solids().sort_by_distance((13.5, -8.75, 0))[0], mode=Mode.SUBTRACT)

    # Sketch6 → Cut-Extrude3 (cut)
    with BuildSketch(Plane.XY):
        with Locations((0, 31)):
            Rectangle(SKETCH6_W, SKETCH6_H)
    extrude(amount=CUT_EXTRUDE3_DEPTH, mode=Mode.SUBTRACT)

    # Sketch7 → Cut-Extrude4 (cut, symmetric)
    with BuildSketch(Plane(origin=(0, 0, 0), x_dir=(0, 0, -1), z_dir=(1, 0, 0))):
        with BuildLine():
            Line((-4, 30.8), (-2.7, 29.5))
            Line((-2.7, 29.5), (-4, 28.2))
            ThreePointArc((-4, 28.2), (-5.3, 29.5), (-4, 30.8))
        make_face()
    extrude(amount=CUT_EXTRUDE4_DEPTH, both=True, mode=Mode.SUBTRACT)

    # Cut-Extrude5 outline → Cut-Extrude5 (cut)
    with BuildSketch(Plane(origin=(0, 0, 0), x_dir=(0, 0, -1), z_dir=(1, 0, 0)).offset(CUT_EXTRUDE5_START)):
        with Locations((-4, 29.5)):
            Circle(CUT_EXTRUDE5_OUTLINE_R)
    extrude(amount=CUT_EXTRUDE5_DEPTH, mode=Mode.SUBTRACT)

    # Sketch14 → Boss-Extrude4 (add)
    with BuildSketch(Plane(origin=(0, 0, 0), x_dir=(0, 0, -1), z_dir=(1, 0, 0)).offset(BOSS_EXTRUDE4_START)):
        with BuildLine():
            Line((-3.5, -19.55), (-12, -12.5))
            Line((-12, -12.5), (0, -12.5))
            Line((0, -12.5), (0, -9.125067568))
            ThreePointArc((0, -9.125067568), (1.998391042, -15.595994569), (-3.5, -19.55))
        make_face()
    extrude(amount=BOSS_EXTRUDE4_DEPTH)

    # Sketch10 → PivotScrewHeadCutout (cut)
    with BuildSketch(Plane(origin=(0, 0, 0), x_dir=(0, 0, -1), z_dir=(1, 0, 0)).offset(PIVOTSCREWHEADCUTOUT_START)):
        with Locations(Location((-3.5, -13.75, 0), (0, 0, 180))):
            Circle(SKETCH10_R)
    extrude(amount=PIVOTSCREWHEADCUTOUT_DEPTH, mode=Mode.SUBTRACT)

    # Sketch4 → Cut-Extrude2 (cut, through all)
    with BuildSketch(Plane.XY.offset(CUT_EXTRUDE2_START)):
        with Locations((-13.5, 29.75)):
            Circle(SKETCH4_R)
        with Locations((-13.5, -8.75)):
            Circle(SKETCH4_R)
    extrude(amount=-CUT_EXTRUDE2_DEPTH, mode=Mode.SUBTRACT)

    # Sketch16 → Cut-Extrude10 (cut, through all)
    with BuildSketch(Plane(origin=(67.926630299, -108.522644494, 12), x_dir=(-1, 0, 0), z_dir=(0, 0, -1)).offset(CUT_EXTRUDE10_START)):
        with Locations(Location((54.426630299, 138.272644494, 0), (0, 0, 180))):
            Circle(SKETCH16_R)
        with Locations(Location((87.676630299, 124.022644494, 0), (0, 0, 180))):
            Circle(SKETCH16_R)
        with Locations(Location((54.426630299, 99.772644494, 0), (0, 0, 187.18205644))):
            Circle(SKETCH16_R)
        with Locations(Location((48.176630299, 124.022644494, 0), (0, 0, 180))):
            Circle(SKETCH16_R)
    extrude(amount=CUT_EXTRUDE10_DEPTH, mode=Mode.SUBTRACT)

    # Sketch9 → Cut-Extrude7 (cut)
    with BuildSketch(Plane(origin=(0, 0, 0), x_dir=(0, 0, -1), z_dir=(1, 0, 0)).offset(CUT_EXTRUDE7_START)):
        with BuildLine():
            Line((-3.5, -12.45), (-2.2, -13.75))
            Line((-2.2, -13.75), (-3.5, -15.05))
            ThreePointArc((-3.5, -15.05), (-4.8, -13.75), (-3.5, -12.45))
        make_face()
    extrude(amount=CUT_EXTRUDE7_DEPTH, mode=Mode.SUBTRACT)

    # Fillet1
    # the kernel refuses this fillet: 3.5 mm, written as the material it takes off along each edge
    with BuildSketch(Plane(origin=(23.5, -25.136011381, -3.234907338), x_dir=(0, 0.769703695807885, -0.6384013006406574), z_dir=(0, 0.6384013006406574, 0.769703695807885)), Plane(origin=(-23.5, -25.136011381, -3.234907338), x_dir=(1, 0, 0), z_dir=(0, 0.6384013006406574, 0.769703695807885))) as fillet1_piece_1:
        with BuildLine():
            CenterArc((FILLET1_R, FILLET1_R), FILLET1_R, 180, 90)
            Line((0, FILLET1_R), (0, 0))
            Line((0, 0), (FILLET1_R, 0))
        make_face()
    extrude(amount=28.543210584, mode=Mode.SUBTRACT)

    # Sketch15 → Cut-Extrude9 (cut, symmetric)
    with BuildSketch(Plane(origin=(0, 0, 0), x_dir=(0, 0, -1), z_dir=(1, 0, 0))):
        with BuildLine():
            Line((-10.3, -13.75), (-10.3, -20.55))
            Line((-10.3, -20.55), (-3.5, -20.55))
            ThreePointArc((-3.5, -20.55), (1.308326112, -8.941673888), (-10.3, -13.75))
        make_face()
    extrude(amount=CUT_EXTRUDE9_DEPTH, both=True, mode=Mode.SUBTRACT)


solid = part.part
